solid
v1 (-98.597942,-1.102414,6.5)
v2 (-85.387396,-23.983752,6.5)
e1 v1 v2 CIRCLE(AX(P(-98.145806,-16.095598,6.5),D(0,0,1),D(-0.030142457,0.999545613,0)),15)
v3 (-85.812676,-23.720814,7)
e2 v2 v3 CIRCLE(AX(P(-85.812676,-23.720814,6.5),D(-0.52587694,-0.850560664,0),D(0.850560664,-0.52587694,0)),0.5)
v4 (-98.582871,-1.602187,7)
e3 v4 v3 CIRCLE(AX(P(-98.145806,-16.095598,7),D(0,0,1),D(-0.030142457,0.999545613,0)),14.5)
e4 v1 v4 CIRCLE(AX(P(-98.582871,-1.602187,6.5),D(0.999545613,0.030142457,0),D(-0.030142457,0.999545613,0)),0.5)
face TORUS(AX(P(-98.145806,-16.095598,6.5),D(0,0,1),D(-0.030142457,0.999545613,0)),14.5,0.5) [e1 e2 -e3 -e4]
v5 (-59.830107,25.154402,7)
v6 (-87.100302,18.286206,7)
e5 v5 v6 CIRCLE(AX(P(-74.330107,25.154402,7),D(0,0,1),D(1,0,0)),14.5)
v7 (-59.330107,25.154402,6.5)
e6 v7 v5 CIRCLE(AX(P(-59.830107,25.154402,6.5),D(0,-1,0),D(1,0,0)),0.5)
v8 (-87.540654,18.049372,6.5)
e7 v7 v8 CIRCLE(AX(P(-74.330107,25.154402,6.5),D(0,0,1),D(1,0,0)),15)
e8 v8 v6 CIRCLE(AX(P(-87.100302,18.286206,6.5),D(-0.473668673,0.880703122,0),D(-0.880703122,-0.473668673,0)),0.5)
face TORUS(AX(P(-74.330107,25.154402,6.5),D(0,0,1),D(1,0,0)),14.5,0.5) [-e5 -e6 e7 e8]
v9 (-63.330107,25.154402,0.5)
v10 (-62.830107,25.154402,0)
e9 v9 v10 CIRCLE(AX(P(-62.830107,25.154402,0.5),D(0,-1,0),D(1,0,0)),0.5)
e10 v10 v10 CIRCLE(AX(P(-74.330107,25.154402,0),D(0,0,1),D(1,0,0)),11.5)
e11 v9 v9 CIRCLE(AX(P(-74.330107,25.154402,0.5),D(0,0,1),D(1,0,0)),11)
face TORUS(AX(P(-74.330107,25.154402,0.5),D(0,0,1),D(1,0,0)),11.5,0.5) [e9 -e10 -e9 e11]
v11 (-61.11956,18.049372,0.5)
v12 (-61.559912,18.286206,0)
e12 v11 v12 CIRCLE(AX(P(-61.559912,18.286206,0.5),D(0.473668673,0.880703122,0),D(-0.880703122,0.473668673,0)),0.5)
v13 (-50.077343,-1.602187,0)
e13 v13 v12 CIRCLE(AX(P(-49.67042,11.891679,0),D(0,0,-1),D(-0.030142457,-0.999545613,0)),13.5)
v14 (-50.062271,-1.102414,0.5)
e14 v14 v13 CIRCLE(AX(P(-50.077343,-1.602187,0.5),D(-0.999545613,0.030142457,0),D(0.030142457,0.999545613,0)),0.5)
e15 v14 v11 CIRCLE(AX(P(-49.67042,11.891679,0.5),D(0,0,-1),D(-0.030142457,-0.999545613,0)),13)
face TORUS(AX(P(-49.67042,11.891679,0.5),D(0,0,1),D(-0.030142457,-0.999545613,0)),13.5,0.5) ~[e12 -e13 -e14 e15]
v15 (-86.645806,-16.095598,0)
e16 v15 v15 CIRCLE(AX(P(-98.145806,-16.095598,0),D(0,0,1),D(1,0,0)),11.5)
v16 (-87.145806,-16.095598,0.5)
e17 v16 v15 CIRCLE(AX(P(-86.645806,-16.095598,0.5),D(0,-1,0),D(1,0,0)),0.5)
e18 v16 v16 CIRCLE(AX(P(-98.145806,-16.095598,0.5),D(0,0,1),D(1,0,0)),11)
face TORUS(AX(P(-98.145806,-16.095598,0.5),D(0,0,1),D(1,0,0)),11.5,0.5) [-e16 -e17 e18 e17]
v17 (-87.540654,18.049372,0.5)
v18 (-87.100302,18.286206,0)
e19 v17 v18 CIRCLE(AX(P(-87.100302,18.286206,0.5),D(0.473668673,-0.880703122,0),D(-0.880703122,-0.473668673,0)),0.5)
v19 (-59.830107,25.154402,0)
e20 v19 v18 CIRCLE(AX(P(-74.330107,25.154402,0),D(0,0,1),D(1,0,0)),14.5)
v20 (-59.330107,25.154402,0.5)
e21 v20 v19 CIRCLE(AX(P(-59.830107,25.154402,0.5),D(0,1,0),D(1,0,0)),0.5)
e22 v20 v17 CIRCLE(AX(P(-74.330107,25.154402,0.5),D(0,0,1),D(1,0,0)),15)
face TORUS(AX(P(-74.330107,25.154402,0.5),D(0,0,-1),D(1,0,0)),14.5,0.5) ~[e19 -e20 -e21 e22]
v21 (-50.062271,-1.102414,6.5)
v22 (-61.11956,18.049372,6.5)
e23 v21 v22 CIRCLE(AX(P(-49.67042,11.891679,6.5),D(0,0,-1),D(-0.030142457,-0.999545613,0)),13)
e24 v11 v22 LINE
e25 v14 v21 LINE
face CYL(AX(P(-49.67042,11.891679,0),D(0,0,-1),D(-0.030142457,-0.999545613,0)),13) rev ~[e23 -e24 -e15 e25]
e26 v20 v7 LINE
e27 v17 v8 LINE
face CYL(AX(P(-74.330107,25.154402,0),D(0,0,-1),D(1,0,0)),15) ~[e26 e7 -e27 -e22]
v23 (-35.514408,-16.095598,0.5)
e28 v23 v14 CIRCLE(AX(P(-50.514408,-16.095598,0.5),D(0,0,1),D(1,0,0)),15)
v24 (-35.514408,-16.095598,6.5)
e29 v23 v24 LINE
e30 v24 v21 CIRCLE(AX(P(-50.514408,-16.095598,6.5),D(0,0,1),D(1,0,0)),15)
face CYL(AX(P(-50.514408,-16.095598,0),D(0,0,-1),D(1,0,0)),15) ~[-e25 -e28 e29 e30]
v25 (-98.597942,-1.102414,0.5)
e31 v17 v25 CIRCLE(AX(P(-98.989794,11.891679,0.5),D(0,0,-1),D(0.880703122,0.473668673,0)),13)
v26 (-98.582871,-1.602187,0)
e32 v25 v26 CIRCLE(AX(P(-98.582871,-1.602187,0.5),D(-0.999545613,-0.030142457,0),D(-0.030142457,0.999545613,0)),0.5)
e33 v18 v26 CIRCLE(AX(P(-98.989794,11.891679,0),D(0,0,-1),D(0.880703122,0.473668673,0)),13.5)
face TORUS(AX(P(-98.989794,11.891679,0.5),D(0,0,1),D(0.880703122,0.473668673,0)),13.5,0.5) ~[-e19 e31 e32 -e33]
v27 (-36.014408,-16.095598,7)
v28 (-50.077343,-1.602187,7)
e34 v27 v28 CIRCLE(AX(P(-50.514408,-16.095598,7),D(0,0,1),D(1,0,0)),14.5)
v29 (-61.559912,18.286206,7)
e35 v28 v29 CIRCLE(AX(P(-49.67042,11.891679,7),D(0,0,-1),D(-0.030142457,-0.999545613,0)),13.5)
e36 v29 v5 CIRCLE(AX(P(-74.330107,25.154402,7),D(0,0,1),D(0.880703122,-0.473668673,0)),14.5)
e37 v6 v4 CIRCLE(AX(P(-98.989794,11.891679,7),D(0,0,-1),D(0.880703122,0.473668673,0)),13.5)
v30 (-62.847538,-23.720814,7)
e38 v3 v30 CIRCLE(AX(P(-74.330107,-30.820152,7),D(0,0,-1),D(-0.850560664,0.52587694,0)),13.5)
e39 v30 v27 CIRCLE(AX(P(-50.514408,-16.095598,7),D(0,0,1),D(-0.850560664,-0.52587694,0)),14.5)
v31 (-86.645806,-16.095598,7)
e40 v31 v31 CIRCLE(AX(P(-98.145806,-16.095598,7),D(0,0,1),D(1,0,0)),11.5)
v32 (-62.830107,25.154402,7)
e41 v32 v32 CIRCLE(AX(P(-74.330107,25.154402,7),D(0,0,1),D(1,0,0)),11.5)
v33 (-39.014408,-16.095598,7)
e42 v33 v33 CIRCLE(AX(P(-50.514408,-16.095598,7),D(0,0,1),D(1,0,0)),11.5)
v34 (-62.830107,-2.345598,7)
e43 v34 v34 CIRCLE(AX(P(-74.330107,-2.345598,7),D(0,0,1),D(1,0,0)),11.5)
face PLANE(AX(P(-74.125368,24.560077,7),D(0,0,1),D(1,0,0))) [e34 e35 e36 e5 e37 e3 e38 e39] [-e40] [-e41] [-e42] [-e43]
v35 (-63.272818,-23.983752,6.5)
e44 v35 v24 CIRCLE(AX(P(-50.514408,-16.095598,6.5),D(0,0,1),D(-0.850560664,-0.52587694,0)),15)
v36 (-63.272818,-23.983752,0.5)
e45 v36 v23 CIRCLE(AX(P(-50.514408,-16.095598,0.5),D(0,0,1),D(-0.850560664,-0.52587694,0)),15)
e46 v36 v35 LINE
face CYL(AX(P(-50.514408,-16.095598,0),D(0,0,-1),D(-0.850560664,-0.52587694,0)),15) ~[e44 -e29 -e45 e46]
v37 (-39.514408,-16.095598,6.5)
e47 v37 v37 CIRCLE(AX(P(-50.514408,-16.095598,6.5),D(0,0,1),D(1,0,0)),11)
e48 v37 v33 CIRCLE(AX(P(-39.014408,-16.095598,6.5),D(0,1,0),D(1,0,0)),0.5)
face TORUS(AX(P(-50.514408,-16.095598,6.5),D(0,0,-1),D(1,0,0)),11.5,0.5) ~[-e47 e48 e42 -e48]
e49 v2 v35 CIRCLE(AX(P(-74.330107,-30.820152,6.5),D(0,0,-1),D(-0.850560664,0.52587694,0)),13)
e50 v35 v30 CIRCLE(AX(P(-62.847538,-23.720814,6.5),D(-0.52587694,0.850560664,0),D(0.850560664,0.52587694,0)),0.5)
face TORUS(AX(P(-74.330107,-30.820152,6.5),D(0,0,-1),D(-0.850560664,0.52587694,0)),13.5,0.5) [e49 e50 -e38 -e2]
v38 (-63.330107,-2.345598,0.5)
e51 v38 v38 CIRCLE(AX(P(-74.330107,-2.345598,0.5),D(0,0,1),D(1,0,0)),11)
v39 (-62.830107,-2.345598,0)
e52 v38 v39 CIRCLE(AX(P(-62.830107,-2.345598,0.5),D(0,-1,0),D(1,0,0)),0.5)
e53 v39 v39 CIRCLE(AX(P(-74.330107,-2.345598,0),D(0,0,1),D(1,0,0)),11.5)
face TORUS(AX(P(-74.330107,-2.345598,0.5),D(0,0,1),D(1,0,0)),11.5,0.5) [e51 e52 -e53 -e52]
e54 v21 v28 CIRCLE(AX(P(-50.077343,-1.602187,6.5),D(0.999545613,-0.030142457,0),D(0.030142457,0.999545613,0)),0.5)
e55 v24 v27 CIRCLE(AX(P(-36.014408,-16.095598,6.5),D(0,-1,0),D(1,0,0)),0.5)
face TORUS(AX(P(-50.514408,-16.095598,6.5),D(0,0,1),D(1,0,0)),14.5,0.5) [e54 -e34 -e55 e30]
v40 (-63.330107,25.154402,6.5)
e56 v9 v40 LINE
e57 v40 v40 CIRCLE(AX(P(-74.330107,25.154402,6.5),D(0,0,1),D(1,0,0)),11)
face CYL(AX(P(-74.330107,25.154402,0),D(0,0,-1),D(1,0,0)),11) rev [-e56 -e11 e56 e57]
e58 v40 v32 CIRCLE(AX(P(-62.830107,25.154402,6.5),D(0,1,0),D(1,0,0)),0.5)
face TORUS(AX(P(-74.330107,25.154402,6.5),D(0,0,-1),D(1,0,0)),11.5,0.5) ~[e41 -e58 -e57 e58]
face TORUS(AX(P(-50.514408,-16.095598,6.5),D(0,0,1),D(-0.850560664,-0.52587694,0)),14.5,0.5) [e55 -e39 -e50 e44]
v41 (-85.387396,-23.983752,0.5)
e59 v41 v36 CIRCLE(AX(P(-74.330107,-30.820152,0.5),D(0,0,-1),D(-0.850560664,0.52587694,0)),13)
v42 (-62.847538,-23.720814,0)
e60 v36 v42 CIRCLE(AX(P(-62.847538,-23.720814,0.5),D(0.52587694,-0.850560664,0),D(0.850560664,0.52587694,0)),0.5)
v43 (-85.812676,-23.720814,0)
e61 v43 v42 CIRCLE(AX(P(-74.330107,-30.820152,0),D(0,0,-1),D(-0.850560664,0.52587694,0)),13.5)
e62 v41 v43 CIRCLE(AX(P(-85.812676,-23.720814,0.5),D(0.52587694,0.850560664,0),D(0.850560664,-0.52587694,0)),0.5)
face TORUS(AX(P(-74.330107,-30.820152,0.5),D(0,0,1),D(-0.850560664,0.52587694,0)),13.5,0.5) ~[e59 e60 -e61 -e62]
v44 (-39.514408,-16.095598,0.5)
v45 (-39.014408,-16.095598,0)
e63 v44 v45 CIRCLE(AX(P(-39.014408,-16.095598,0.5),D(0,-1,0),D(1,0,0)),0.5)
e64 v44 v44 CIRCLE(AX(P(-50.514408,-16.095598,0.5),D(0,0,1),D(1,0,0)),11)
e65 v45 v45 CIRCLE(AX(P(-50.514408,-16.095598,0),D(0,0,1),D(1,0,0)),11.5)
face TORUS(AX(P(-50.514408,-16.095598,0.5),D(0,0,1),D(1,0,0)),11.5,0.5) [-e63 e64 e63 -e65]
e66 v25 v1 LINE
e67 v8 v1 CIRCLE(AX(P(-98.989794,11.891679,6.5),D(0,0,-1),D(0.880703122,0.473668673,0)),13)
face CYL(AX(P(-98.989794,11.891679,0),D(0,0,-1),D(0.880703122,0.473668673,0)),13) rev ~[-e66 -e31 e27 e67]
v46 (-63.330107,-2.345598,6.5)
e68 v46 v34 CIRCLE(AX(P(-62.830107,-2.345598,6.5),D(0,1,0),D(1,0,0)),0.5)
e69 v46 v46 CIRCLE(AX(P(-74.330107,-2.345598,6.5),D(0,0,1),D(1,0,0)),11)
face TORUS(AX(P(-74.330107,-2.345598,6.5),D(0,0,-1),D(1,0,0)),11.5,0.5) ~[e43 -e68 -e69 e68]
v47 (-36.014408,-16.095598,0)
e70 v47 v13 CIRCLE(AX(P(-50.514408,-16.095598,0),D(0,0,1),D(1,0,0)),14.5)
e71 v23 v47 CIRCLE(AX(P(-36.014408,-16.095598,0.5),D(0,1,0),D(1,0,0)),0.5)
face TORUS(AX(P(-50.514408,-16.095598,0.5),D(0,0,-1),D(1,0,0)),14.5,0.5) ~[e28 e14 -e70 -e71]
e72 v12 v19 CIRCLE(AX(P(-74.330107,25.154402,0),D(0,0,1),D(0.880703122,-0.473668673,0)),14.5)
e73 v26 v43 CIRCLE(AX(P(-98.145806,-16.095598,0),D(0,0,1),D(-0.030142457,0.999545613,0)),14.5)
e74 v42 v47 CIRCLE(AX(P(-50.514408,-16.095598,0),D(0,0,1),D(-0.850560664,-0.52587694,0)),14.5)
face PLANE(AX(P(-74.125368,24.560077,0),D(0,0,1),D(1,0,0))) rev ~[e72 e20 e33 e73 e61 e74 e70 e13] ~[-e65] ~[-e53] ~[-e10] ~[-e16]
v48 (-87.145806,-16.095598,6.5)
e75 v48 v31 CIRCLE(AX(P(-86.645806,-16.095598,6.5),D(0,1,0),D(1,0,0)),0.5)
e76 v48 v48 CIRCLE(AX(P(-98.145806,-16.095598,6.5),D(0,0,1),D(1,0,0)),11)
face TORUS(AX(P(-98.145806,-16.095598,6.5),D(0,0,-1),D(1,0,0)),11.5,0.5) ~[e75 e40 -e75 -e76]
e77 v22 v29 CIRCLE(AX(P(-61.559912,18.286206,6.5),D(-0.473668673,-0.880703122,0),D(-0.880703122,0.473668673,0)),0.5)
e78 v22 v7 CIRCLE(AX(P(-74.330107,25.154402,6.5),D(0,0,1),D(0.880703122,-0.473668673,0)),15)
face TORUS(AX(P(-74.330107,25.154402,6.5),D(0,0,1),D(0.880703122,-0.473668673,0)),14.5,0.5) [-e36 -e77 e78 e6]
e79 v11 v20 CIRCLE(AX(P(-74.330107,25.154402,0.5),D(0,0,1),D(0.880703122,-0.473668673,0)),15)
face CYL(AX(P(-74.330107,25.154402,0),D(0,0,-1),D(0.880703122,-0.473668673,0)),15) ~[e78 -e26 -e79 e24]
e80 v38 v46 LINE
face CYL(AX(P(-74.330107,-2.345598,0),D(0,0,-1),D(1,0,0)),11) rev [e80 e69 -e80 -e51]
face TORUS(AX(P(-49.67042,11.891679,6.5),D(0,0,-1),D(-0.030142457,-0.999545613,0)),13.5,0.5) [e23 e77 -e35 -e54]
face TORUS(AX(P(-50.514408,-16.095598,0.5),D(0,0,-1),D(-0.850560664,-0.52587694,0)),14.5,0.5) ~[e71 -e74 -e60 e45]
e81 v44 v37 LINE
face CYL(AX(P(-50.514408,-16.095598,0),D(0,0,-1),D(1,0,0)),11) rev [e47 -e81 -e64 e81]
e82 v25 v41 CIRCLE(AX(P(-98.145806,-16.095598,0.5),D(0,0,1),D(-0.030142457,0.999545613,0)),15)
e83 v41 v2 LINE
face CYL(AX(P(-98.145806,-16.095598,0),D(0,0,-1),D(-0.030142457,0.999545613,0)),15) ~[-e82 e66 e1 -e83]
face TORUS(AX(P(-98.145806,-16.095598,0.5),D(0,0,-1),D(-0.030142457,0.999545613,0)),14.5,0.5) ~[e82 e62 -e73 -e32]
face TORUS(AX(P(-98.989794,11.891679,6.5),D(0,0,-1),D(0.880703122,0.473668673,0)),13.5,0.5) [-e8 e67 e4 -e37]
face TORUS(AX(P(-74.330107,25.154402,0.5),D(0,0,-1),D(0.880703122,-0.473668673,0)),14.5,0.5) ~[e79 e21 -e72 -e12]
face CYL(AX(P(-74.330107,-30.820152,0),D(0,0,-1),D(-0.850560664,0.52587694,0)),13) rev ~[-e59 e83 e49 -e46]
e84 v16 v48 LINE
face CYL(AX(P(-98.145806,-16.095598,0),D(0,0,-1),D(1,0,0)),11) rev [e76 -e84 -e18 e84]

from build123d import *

# Parameters (mm, degrees)
F0_R     = 11
F1_DEPTH = 7
F2_R     = 0.5


# Not quite as in the source:
# - a feature names something its author has since deleted; it is built from what else it names


with BuildPart() as f1:
    # F0 (on Top) → F1 (new body)
    with BuildSketch(Plane.XY):
        with BuildLine():
            ThreePointArc((-61.119560109, 18.0493719403), (-59.7843480604, 21.4909475398), (-59.330106933, 25.1544020325))
            ThreePointArc((-59.330106933, 25.1544020325), (-77.9935614257, 39.7001609051), (-87.540653757, 18.0493719403))
            ThreePointArc((-87.540653757, 18.0493719403), (-84.4913145964, 14.1203701845), (-80.3248963371, 11.4044020325))
            ThreePointArc((-80.3248963371, 11.4044020325), (-74.330106933, 12.6544020325), (-68.3353175289, 11.4044020325))
            ThreePointArc((-68.3353175289, 11.4044020325), (-64.1688992696, 14.1203701845), (-61.119560109, 18.0493719403))
        make_face()
        with Locations((-74.330106933, 25.1544020325)):
            Circle(F0_R, mode=Mode.SUBTRACT)
        with BuildLine():
            ThreePointArc((-80.3248963371, 11.4044020325), (-84.4913145964, 14.1203701845), (-87.540653757, 18.0493719403))
            ThreePointArc((-87.540653757, 18.0493719403), (-87.7314640886, 5.3916791938), (-98.5979423946, -1.102413774))
            ThreePointArc((-98.5979423946, -1.102413774), (-93.6706574823, -1.7787180739), (-89.2353509371, -4.0289580532))
            ThreePointArc((-89.2353509371, -4.0289580532), (-87.3204879898, 5.1544020325), (-80.3248963371, 11.4044020325))
        make_face()
        with BuildLine():
            ThreePointArc((-50.0622714714, -1.102413774), (-60.9287497774, 5.3916791938), (-61.119560109, 18.0493719403))
            ThreePointArc((-61.119560109, 18.0493719403), (-64.1688992696, 14.1203701845), (-68.3353175289, 11.4044020325))
            ThreePointArc((-68.3353175289, 11.4044020325), (-61.7817635949, 5.8726183517), (-59.330106933, -2.3455979675))
            ThreePointArc((-59.330106933, -2.3455979675), (-59.3538146672, -3.1886104047), (-59.4248629289, -4.0289580532))
            ThreePointArc((-59.4248629289, -4.0289580532), (-54.9895563837, -1.7787180739), (-50.0622714714, -1.102413774))
        make_face()
        with BuildLine():
            ThreePointArc((-68.3353175289, 11.4044020325), (-74.330106933, 12.6544020325), (-80.3248963371, 11.4044020325))
            ThreePointArc((-80.3248963371, 11.4044020325), (-74.330106933, 10.1544020325), (-68.3353175289, 11.4044020325))
        make_face()
        with BuildLine():
            ThreePointArc((-68.3353175289, 11.4044020325), (-74.330106933, 10.1544020325), (-80.3248963371, 11.4044020325))
            ThreePointArc((-80.3248963371, 11.4044020325), (-87.3204879898, 5.1544020325), (-89.2353509371, -4.0289580532))
            ThreePointArc((-89.2353509371, -4.0289580532), (-85.1554244803, -8.5955979675), (-83.240561533, -14.4122378818))
            ThreePointArc((-83.240561533, -14.4122378818), (-74.330106933, -17.3455979675), (-65.419652333, -14.4122378818))
            ThreePointArc((-65.419652333, -14.4122378818), (-63.5047893857, -8.5955979675), (-59.4248629289, -4.0289580532))
            ThreePointArc((-59.4248629289, -4.0289580532), (-59.3538146672, -3.1886104047), (-59.330106933, -2.3455979675))
            ThreePointArc((-59.330106933, -2.3455979675), (-61.7817635949, 5.8726183517), (-68.3353175289, 11.4044020325))
        make_face()
        with Locations((-74.330106933, -2.3455979675)):
            Circle(F0_R, mode=Mode.SUBTRACT)
        with BuildLine():
            ThreePointArc((-89.2353509371, -4.0289580532), (-93.6706574823, -1.7787180739), (-98.5979423946, -1.102413774))
            ThreePointArc((-98.5979423946, -1.102413774), (-111.1361865938, -23.5955979675), (-85.3873955706, -23.9837520689))
            ThreePointArc((-85.3873955706, -23.9837520689), (-83.7170815897, -20.1958327476), (-83.1458055371, -16.0955979675))
            ThreePointArc((-83.1458055371, -16.0955979675), (-83.1695132713, -15.2525855304), (-83.240561533, -14.4122378818))
            ThreePointArc((-83.240561533, -14.4122378818), (-87.3204879898, -9.8455979675), (-89.2353509371, -4.0289580532))
        make_face()
        with Locations((-98.1458055371, -16.0955979675)):
            Circle(F0_R, mode=Mode.SUBTRACT)
        with BuildLine():
            ThreePointArc((-35.5144083289, -16.0955979675), (-39.7491388743, -5.650073875), (-50.0622714714, -1.102413774))
            ThreePointArc((-50.0622714714, -1.102413774), (-54.9895563837, -1.7787180739), (-59.4248629289, -4.0289580532))
            ThreePointArc((-59.4248629289, -4.0289580532), (-61.3397258762, -9.8455979675), (-65.419652333, -14.4122378818))
            ThreePointArc((-65.419652333, -14.4122378818), (-65.1507640471, -19.3784460131), (-63.2728182954, -23.9837520689))
            ThreePointArc((-63.2728182954, -23.9837520689), (-46.4141735489, -30.5243219149), (-35.5144083289, -16.0955979675))
        make_face()
        with Locations((-50.5144083289, -16.0955979675)):
            Circle(F0_R, mode=Mode.SUBTRACT)
        with BuildLine():
            ThreePointArc((-83.240561533, -14.4122378818), (-85.1554244803, -8.5955979675), (-89.2353509371, -4.0289580532))
            ThreePointArc((-89.2353509371, -4.0289580532), (-87.3204879898, -9.8455979675), (-83.240561533, -14.4122378818))
        make_face()
        with BuildLine():
            ThreePointArc((-83.1458055371, -16.0955979675), (-83.7170815897, -20.1958327476), (-85.3873955706, -23.9837520689))
            ThreePointArc((-85.3873955706, -23.9837520689), (-74.330106933, -17.8201522901), (-63.2728182954, -23.9837520689))
            ThreePointArc((-63.2728182954, -23.9837520689), (-65.1507640471, -19.3784460131), (-65.419652333, -14.4122378818))
            ThreePointArc((-65.419652333, -14.4122378818), (-74.330106933, -17.3455979675), (-83.240561533, -14.4122378818))
            ThreePointArc((-83.240561533, -14.4122378818), (-83.1695132713, -15.2525855304), (-83.1458055371, -16.0955979675))
        make_face()
        with BuildLine():
            ThreePointArc((-65.419652333, -14.4122378818), (-61.3397258762, -9.8455979675), (-59.4248629289, -4.0289580532))
            ThreePointArc((-59.4248629289, -4.0289580532), (-63.5047893857, -8.5955979675), (-65.419652333, -14.4122378818))
        make_face()
    extrude(amount=F1_DEPTH)

    # F2
    f2_edges = [f1.edges().sort_by_distance(p)[0] for p in [
        (-111.136187, -23.595598, 0),
        (-74.330107, -17.820152, 0),
        (-37.524027, -23.595598, 0),
        (-60.92875, 5.391679, 0),
        (-74.330107, 40.154402, 0),
        (-87.731464, 5.391679, 0),
        (-109.145806, -16.095598, 0),
        (-61.514408, -16.095598, 0),
        (-85.330107, -2.345598, 0),
        (-85.330107, 25.154402, 0),
        (-111.136187, -23.595598, 7),
        (-74.330107, -17.820152, 7),
        (-37.524027, -23.595598, 7),
        (-60.92875, 5.391679, 7),
        (-74.330107, 40.154402, 7),
        (-87.731464, 5.391679, 7),
        (-109.145806, -16.095598, 7),
        (-61.514408, -16.095598, 7),
        (-85.330107, -2.345598, 7),
        (-85.330107, 25.154402, 7),
    ]]
    fillet(f2_edges, radius=F2_R)


solid = f1.part
